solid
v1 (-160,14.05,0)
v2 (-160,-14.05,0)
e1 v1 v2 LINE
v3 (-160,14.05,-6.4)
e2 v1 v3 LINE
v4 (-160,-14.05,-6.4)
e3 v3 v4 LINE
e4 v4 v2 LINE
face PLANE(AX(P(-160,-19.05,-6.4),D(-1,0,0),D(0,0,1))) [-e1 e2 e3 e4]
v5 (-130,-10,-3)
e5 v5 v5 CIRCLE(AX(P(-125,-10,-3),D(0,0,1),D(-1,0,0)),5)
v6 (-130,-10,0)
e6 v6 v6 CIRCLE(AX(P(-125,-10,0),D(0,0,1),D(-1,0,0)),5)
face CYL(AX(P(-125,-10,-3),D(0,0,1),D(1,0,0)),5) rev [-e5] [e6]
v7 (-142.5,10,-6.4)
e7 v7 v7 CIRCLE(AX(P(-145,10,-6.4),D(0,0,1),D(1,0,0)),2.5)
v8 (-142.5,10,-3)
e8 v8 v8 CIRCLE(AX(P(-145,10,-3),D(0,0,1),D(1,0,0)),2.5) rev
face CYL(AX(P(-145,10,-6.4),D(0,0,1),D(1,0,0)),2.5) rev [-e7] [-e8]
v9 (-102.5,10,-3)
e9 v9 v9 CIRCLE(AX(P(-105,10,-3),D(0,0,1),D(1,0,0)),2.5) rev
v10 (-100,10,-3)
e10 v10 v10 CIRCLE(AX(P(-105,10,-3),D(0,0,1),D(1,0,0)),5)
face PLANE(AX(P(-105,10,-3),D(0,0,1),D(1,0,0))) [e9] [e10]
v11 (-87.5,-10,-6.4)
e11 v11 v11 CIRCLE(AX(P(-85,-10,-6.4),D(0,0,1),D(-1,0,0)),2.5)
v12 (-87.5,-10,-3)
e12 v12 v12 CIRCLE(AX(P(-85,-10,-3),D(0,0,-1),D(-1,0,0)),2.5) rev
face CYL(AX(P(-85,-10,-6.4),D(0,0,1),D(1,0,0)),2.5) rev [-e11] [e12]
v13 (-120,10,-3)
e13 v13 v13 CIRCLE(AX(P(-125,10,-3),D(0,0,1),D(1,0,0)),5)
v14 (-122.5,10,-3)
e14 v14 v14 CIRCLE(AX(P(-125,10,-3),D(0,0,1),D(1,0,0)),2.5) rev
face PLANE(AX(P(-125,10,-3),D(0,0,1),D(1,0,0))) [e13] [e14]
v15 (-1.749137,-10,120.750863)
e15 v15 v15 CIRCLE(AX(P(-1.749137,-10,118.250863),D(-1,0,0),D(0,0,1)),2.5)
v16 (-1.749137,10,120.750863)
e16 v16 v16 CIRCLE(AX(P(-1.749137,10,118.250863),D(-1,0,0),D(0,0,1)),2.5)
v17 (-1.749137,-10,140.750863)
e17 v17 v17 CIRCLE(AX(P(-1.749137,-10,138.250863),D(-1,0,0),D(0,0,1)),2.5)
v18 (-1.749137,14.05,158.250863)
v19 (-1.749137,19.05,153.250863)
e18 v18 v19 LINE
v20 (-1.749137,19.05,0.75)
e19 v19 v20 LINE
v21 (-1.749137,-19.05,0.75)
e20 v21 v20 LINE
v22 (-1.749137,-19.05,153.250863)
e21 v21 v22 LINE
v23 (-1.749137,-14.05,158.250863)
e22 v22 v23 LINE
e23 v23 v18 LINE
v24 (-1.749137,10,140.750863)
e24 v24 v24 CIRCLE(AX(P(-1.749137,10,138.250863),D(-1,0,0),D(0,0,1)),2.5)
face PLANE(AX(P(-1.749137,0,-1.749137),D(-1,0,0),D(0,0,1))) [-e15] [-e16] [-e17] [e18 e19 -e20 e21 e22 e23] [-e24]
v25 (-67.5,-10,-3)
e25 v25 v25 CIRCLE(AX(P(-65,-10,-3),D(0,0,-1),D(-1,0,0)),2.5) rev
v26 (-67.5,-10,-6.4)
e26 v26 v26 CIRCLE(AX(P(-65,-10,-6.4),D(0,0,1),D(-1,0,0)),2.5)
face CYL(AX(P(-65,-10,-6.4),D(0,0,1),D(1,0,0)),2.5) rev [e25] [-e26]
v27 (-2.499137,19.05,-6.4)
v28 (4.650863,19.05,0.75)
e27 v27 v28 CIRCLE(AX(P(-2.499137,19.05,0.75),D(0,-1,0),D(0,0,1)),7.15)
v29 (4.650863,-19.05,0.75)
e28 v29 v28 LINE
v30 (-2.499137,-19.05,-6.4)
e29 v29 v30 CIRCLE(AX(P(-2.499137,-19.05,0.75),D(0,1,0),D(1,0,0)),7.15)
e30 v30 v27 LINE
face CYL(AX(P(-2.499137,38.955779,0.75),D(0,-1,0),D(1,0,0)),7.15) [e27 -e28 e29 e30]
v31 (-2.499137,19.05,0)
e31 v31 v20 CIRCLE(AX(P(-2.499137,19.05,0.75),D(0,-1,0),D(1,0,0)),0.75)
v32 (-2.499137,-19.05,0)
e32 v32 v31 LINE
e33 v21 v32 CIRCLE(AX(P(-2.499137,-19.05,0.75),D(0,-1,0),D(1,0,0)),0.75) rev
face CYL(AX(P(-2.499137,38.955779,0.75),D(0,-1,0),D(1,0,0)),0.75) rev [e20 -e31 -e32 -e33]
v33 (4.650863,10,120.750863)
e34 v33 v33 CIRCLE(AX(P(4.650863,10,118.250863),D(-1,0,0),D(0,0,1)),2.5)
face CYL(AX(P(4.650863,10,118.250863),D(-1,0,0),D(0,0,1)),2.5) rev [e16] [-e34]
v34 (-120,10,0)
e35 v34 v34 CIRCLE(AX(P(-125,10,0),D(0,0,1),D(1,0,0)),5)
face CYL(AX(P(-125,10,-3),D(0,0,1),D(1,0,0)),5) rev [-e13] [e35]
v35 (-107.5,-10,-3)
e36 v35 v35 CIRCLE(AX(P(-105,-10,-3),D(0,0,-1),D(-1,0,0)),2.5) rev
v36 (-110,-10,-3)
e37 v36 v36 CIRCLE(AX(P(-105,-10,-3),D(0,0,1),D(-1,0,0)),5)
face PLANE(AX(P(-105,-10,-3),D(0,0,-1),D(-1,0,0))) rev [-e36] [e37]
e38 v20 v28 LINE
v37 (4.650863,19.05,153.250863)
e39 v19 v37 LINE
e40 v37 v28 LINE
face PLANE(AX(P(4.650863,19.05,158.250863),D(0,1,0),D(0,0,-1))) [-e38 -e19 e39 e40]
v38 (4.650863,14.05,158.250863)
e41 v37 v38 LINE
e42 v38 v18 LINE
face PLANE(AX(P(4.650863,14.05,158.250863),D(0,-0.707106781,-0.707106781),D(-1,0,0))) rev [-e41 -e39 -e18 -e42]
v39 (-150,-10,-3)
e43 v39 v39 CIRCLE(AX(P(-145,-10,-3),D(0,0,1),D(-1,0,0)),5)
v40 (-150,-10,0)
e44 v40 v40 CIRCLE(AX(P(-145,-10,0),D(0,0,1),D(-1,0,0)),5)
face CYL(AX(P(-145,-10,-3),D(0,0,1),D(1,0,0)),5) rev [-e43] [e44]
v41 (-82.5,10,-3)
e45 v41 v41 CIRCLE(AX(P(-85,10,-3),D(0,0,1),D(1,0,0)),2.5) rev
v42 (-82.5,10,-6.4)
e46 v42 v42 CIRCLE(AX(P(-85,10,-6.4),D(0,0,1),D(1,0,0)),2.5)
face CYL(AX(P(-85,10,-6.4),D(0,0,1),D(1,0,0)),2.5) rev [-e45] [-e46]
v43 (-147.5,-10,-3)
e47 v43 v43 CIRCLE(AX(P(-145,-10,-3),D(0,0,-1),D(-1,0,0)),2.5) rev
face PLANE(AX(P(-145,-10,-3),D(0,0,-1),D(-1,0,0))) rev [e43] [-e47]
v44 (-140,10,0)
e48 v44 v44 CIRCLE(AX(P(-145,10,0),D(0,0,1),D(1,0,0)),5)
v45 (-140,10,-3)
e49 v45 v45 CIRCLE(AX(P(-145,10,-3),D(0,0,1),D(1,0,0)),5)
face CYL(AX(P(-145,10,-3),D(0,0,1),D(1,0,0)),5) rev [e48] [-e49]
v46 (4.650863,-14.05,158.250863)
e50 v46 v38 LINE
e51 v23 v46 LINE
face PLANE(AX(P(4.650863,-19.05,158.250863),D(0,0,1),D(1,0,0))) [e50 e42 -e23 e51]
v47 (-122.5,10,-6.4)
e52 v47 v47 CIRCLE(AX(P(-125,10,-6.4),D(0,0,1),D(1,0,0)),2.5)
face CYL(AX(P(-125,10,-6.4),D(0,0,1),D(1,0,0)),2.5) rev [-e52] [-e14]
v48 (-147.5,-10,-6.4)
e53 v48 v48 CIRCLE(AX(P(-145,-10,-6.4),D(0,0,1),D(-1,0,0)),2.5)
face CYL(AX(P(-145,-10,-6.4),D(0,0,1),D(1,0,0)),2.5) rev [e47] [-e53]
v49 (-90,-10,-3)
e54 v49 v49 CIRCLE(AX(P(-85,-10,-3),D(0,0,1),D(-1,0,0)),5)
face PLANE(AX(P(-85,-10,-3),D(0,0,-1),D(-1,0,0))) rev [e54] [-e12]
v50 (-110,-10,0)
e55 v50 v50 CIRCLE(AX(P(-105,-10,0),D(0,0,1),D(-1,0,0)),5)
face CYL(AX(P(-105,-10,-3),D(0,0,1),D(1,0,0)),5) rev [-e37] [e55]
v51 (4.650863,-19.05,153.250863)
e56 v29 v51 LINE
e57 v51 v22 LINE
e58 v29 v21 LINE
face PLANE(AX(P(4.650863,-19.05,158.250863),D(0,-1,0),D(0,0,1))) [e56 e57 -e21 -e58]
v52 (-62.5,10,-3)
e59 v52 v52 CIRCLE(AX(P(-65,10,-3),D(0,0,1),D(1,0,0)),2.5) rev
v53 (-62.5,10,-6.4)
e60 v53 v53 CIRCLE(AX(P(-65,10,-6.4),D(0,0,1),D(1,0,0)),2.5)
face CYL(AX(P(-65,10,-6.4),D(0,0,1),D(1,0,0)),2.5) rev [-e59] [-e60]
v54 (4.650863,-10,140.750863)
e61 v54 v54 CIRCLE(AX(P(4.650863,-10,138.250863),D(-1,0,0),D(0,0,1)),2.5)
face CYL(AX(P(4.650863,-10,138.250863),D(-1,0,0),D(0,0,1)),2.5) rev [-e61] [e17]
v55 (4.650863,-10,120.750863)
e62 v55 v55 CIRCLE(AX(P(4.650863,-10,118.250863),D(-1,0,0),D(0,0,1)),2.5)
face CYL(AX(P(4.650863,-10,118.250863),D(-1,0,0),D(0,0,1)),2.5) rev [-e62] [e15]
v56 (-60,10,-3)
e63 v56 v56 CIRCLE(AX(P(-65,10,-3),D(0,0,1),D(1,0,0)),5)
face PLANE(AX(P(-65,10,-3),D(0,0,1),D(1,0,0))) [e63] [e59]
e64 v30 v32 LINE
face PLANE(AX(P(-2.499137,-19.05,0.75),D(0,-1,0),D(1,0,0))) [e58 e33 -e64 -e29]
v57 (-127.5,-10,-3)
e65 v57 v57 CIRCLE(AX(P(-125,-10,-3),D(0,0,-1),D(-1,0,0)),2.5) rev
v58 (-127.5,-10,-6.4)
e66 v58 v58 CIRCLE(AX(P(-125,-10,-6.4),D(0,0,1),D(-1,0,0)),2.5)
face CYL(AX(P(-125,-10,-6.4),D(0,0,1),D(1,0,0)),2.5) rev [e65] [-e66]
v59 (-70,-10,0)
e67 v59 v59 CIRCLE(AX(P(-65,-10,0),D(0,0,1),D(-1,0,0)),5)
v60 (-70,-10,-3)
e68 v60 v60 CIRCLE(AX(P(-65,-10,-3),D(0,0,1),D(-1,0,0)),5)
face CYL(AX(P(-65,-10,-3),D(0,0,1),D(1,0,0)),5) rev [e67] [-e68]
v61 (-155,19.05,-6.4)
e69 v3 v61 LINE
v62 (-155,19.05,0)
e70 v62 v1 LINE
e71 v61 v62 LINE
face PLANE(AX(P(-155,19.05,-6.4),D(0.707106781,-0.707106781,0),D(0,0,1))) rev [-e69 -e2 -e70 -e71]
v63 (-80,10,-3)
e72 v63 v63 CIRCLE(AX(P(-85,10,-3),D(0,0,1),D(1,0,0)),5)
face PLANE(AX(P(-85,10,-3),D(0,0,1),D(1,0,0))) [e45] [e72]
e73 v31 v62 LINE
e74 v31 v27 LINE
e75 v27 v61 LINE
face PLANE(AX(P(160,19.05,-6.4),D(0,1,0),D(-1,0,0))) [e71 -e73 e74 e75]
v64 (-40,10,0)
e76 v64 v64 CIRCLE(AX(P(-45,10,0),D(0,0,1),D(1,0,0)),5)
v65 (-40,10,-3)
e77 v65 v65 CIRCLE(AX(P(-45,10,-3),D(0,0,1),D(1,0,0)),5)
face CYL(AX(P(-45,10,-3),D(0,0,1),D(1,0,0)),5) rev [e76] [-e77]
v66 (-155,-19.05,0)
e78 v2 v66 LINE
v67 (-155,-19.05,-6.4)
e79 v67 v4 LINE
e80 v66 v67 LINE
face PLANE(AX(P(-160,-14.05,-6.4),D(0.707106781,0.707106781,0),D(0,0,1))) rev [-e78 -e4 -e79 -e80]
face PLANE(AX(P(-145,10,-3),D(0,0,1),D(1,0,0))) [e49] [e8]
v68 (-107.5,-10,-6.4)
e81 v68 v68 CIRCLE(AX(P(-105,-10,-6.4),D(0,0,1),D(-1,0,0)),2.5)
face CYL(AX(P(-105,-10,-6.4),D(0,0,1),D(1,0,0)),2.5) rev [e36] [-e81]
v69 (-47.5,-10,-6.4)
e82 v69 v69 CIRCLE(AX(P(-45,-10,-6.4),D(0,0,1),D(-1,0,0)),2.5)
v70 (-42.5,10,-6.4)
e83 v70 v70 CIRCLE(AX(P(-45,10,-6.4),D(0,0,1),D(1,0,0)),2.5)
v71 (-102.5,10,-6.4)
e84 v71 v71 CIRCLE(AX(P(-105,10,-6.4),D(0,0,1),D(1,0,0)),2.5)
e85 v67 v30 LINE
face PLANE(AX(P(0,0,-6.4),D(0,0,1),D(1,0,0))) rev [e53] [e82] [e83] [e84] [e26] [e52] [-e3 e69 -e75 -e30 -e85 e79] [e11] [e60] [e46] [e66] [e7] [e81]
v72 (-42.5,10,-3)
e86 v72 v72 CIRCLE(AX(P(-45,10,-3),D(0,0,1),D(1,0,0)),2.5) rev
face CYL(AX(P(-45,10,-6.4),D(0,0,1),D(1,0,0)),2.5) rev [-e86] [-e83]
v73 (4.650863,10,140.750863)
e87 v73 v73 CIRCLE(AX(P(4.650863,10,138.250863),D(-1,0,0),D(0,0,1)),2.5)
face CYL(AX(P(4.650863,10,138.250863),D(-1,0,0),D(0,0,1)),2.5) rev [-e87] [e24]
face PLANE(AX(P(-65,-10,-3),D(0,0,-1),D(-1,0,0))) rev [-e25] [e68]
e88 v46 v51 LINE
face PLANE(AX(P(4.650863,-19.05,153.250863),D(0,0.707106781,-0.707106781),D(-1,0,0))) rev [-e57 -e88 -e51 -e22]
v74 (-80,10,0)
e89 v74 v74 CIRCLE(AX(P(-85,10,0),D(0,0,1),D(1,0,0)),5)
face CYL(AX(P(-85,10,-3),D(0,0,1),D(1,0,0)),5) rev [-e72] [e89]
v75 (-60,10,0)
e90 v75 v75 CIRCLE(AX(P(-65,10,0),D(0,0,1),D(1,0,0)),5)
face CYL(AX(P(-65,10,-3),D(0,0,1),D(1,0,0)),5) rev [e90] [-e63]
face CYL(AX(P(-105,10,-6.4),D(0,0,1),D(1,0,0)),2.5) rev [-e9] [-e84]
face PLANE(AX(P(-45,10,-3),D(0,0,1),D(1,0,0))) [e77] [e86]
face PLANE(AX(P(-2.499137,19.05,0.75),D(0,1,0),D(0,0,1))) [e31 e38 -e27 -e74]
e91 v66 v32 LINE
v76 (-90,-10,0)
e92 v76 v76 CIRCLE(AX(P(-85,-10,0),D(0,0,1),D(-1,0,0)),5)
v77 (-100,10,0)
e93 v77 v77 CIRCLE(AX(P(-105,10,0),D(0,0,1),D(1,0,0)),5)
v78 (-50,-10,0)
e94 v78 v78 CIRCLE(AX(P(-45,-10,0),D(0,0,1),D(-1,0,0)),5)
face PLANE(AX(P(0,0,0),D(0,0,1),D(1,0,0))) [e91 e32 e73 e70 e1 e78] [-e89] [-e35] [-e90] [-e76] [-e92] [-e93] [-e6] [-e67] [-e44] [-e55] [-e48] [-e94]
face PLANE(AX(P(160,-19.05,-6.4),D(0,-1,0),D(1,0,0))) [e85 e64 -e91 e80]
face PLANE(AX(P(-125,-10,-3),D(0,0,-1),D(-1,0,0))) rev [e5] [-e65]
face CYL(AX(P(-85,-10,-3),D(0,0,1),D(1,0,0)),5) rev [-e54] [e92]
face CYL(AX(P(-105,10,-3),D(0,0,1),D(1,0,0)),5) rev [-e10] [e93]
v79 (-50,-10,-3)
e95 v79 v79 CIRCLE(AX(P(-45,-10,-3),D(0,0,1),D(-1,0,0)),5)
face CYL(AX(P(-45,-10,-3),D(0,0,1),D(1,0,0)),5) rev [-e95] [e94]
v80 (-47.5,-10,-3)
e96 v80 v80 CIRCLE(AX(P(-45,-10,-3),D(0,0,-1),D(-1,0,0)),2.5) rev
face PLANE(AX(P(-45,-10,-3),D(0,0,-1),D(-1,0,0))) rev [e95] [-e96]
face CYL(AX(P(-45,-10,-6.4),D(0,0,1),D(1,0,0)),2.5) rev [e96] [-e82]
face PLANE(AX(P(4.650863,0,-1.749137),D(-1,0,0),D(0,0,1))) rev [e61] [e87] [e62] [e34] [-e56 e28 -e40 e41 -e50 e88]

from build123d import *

# Parameters (mm, degrees)
SKETCH1_W                  = 320
SKETCH1_H                  = 38.1
SKETCH1_R                  = 2.5
BASE_FLANGE1_DEPTH         = 6.4
CHAMFER2_SIZE              = 5
SKETCH32_R                 = 5
CUT_EXTRUDE2_DEPTH         = 3
SKETCHED_START             = 4.650863044
SKETCHED_BEND1_OUTLINE_W   = 38.1
SKETCHED_BEND1_OUTLINE_H   = 6.4
SKETCHED_BEND1_DEPTH       = 155.349136956
SKETCHED_START_2           = -2.499136956
SKETCHED_BEND1_2_OUTLINE_R = 2.5
SKETCHED_BEND1_2_DEPTH     = 7.15
SKETCHED_START_3           = -20
SKETCHED_BEND1_3_DEPTH     = 40


with BuildPart() as part:
    # Base-Flange1: sheet metal written as solids
    # Sketch1 → Base-Flange1 (new body)
    with BuildSketch(Plane.XY):
        Rectangle(SKETCH1_W, SKETCH1_H)
        with Locations((-145, 10)):
            Circle(SKETCH1_R, mode=Mode.SUBTRACT)
        with Locations((-125, 10)):
            Circle(SKETCH1_R, mode=Mode.SUBTRACT)
        with Locations((-105, 10)):
            Circle(SKETCH1_R, mode=Mode.SUBTRACT)
        with Locations((-85, 10)):
            Circle(SKETCH1_R, mode=Mode.SUBTRACT)
        with Locations((-65, 10)):
            Circle(SKETCH1_R, mode=Mode.SUBTRACT)
        with Locations((-45, 10)):
            Circle(SKETCH1_R, mode=Mode.SUBTRACT)
        with Locations(Location((-145, -10, 0), (0, 0, 180))):
            Circle(SKETCH1_R, mode=Mode.SUBTRACT)
        with Locations(Location((-125, -10, 0), (0, 0, 180))):
            Circle(SKETCH1_R, mode=Mode.SUBTRACT)
        with Locations(Location((-105, -10, 0), (0, 0, 180))):
            Circle(SKETCH1_R, mode=Mode.SUBTRACT)
        with Locations(Location((-85, -10, 0), (0, 0, 180))):
            Circle(SKETCH1_R, mode=Mode.SUBTRACT)
        with Locations(Location((-65, -10, 0), (0, 0, 180))):
            Circle(SKETCH1_R, mode=Mode.SUBTRACT)
        with Locations(Location((-45, -10, 0), (0, 0, 180))):
            Circle(SKETCH1_R, mode=Mode.SUBTRACT)
        with Locations((140, 10)):
            Circle(SKETCH1_R, mode=Mode.SUBTRACT)
        with Locations((120, 10)):
            Circle(SKETCH1_R, mode=Mode.SUBTRACT)
        with Locations((120, -10)):
            Circle(SKETCH1_R, mode=Mode.SUBTRACT)
        with Locations((140, -10)):
            Circle(SKETCH1_R, mode=Mode.SUBTRACT)
    extrude(amount=-BASE_FLANGE1_DEPTH)

    # Chamfer2
    chamfer2_edges = [part.edges().sort_by_distance(p)[0] for p in [
        (-160, 19.05, -3.2),
        (160, 19.05, -3.2),
        (160, -19.05, -3.2),
        (-160, -19.05, -3.2),
    ]]
    chamfer(chamfer2_edges, length=CHAMFER2_SIZE)

    # Sketch32 → Cut-Extrude2 (cut)
    with BuildSketch(Plane.XY):
        with Locations((-145, 10)):
            Circle(SKETCH32_R)
        with Locations((-125, 10)):
            Circle(SKETCH32_R)
        with Locations((-105, 10)):
            Circle(SKETCH32_R)
        with Locations((-85, 10)):
            Circle(SKETCH32_R)
        with Locations((-65, 10)):
            Circle(SKETCH32_R)
        with Locations((-45, 10)):
            Circle(SKETCH32_R)
        with Locations(Location((-45, -10, 0), (0, 0, 180))):
            Circle(SKETCH32_R)
        with Locations(Location((-65, -10, 0), (0, 0, 180))):
            Circle(SKETCH32_R)
        with Locations(Location((-85, -10, 0), (0, 0, 180))):
            Circle(SKETCH32_R)
        with Locations(Location((-105, -10, 0), (0, 0, 180))):
            Circle(SKETCH32_R)
        with Locations(Location((-125, -10, 0), (0, 0, 180))):
            Circle(SKETCH32_R)
        with Locations(Location((-145, -10, 0), (0, 0, 180))):
            Circle(SKETCH32_R)
    extrude(amount=-CUT_EXTRUDE2_DEPTH, mode=Mode.SUBTRACT)

    # Sketched Bend1: read off the stored shape, not the designer's step
    # Sketched Bend1 outline → Sketched Bend1 (cut)
    with BuildSketch(Plane.YZ.offset(SKETCHED_START)):
        with Locations((0, -3.2)):
            Rectangle(SKETCHED_BEND1_OUTLINE_W, SKETCHED_BEND1_OUTLINE_H)
    extrude(amount=SKETCHED_BEND1_DEPTH, mode=Mode.SUBTRACT)

    # Sketched Bend1 2 outline → Sketched Bend1 2 (add)
    with BuildSketch(Plane.YZ.offset(SKETCHED_START_2)):
        Polygon((-19.05, 0), (19.05, 0), (19.05, 153.250863044), (14.05, 158.250863044), (-14.05, 158.250863044), (-19.05, 153.250863044), align=None)
        with Locations((-10, 118.250863044)):
            Circle(SKETCHED_BEND1_2_OUTLINE_R, mode=Mode.SUBTRACT)
        with Locations((-10, 138.250863044)):
            Circle(SKETCHED_BEND1_2_OUTLINE_R, mode=Mode.SUBTRACT)
        with Locations((10, 118.250863044)):
            Circle(SKETCHED_BEND1_2_OUTLINE_R, mode=Mode.SUBTRACT)
        with Locations((10, 138.250863044)):
            Circle(SKETCHED_BEND1_2_OUTLINE_R, mode=Mode.SUBTRACT)
    extrude(amount=SKETCHED_BEND1_2_DEPTH)

    # Sketched Bend1 3 outline → Sketched Bend1 3 (cut)
    with BuildSketch(Plane(origin=(0, 0, 0), x_dir=(1, 0, 0), z_dir=(0, 1, 0)).offset(SKETCHED_START_3)):
        with BuildLine():
            Line((4.650863044, 6.4), (-2.499136956, 6.4))
            ThreePointArc((-2.499136956, 6.4), (2.55667653, 4.305813485), (4.650863044, -0.75))
            Line((4.650863044, -0.75), (4.650863044, 6.4))
        make_face()
        with BuildLine():
            Line((-2.499136956, -158.250863044), (-1.749136956, -158.250863044))
            Line((-1.749136956, -158.250863044), (-1.749136956, -0.75))
            ThreePointArc((-1.749136956, -0.75), (-1.96880687, -0.219669914), (-2.499136956, 0))
            Line((-2.499136956, 0), (-2.499136956, -158.250863044))
        make_face()
    extrude(amount=SKETCHED_BEND1_3_DEPTH, mode=Mode.SUBTRACT)


solid = part.part
